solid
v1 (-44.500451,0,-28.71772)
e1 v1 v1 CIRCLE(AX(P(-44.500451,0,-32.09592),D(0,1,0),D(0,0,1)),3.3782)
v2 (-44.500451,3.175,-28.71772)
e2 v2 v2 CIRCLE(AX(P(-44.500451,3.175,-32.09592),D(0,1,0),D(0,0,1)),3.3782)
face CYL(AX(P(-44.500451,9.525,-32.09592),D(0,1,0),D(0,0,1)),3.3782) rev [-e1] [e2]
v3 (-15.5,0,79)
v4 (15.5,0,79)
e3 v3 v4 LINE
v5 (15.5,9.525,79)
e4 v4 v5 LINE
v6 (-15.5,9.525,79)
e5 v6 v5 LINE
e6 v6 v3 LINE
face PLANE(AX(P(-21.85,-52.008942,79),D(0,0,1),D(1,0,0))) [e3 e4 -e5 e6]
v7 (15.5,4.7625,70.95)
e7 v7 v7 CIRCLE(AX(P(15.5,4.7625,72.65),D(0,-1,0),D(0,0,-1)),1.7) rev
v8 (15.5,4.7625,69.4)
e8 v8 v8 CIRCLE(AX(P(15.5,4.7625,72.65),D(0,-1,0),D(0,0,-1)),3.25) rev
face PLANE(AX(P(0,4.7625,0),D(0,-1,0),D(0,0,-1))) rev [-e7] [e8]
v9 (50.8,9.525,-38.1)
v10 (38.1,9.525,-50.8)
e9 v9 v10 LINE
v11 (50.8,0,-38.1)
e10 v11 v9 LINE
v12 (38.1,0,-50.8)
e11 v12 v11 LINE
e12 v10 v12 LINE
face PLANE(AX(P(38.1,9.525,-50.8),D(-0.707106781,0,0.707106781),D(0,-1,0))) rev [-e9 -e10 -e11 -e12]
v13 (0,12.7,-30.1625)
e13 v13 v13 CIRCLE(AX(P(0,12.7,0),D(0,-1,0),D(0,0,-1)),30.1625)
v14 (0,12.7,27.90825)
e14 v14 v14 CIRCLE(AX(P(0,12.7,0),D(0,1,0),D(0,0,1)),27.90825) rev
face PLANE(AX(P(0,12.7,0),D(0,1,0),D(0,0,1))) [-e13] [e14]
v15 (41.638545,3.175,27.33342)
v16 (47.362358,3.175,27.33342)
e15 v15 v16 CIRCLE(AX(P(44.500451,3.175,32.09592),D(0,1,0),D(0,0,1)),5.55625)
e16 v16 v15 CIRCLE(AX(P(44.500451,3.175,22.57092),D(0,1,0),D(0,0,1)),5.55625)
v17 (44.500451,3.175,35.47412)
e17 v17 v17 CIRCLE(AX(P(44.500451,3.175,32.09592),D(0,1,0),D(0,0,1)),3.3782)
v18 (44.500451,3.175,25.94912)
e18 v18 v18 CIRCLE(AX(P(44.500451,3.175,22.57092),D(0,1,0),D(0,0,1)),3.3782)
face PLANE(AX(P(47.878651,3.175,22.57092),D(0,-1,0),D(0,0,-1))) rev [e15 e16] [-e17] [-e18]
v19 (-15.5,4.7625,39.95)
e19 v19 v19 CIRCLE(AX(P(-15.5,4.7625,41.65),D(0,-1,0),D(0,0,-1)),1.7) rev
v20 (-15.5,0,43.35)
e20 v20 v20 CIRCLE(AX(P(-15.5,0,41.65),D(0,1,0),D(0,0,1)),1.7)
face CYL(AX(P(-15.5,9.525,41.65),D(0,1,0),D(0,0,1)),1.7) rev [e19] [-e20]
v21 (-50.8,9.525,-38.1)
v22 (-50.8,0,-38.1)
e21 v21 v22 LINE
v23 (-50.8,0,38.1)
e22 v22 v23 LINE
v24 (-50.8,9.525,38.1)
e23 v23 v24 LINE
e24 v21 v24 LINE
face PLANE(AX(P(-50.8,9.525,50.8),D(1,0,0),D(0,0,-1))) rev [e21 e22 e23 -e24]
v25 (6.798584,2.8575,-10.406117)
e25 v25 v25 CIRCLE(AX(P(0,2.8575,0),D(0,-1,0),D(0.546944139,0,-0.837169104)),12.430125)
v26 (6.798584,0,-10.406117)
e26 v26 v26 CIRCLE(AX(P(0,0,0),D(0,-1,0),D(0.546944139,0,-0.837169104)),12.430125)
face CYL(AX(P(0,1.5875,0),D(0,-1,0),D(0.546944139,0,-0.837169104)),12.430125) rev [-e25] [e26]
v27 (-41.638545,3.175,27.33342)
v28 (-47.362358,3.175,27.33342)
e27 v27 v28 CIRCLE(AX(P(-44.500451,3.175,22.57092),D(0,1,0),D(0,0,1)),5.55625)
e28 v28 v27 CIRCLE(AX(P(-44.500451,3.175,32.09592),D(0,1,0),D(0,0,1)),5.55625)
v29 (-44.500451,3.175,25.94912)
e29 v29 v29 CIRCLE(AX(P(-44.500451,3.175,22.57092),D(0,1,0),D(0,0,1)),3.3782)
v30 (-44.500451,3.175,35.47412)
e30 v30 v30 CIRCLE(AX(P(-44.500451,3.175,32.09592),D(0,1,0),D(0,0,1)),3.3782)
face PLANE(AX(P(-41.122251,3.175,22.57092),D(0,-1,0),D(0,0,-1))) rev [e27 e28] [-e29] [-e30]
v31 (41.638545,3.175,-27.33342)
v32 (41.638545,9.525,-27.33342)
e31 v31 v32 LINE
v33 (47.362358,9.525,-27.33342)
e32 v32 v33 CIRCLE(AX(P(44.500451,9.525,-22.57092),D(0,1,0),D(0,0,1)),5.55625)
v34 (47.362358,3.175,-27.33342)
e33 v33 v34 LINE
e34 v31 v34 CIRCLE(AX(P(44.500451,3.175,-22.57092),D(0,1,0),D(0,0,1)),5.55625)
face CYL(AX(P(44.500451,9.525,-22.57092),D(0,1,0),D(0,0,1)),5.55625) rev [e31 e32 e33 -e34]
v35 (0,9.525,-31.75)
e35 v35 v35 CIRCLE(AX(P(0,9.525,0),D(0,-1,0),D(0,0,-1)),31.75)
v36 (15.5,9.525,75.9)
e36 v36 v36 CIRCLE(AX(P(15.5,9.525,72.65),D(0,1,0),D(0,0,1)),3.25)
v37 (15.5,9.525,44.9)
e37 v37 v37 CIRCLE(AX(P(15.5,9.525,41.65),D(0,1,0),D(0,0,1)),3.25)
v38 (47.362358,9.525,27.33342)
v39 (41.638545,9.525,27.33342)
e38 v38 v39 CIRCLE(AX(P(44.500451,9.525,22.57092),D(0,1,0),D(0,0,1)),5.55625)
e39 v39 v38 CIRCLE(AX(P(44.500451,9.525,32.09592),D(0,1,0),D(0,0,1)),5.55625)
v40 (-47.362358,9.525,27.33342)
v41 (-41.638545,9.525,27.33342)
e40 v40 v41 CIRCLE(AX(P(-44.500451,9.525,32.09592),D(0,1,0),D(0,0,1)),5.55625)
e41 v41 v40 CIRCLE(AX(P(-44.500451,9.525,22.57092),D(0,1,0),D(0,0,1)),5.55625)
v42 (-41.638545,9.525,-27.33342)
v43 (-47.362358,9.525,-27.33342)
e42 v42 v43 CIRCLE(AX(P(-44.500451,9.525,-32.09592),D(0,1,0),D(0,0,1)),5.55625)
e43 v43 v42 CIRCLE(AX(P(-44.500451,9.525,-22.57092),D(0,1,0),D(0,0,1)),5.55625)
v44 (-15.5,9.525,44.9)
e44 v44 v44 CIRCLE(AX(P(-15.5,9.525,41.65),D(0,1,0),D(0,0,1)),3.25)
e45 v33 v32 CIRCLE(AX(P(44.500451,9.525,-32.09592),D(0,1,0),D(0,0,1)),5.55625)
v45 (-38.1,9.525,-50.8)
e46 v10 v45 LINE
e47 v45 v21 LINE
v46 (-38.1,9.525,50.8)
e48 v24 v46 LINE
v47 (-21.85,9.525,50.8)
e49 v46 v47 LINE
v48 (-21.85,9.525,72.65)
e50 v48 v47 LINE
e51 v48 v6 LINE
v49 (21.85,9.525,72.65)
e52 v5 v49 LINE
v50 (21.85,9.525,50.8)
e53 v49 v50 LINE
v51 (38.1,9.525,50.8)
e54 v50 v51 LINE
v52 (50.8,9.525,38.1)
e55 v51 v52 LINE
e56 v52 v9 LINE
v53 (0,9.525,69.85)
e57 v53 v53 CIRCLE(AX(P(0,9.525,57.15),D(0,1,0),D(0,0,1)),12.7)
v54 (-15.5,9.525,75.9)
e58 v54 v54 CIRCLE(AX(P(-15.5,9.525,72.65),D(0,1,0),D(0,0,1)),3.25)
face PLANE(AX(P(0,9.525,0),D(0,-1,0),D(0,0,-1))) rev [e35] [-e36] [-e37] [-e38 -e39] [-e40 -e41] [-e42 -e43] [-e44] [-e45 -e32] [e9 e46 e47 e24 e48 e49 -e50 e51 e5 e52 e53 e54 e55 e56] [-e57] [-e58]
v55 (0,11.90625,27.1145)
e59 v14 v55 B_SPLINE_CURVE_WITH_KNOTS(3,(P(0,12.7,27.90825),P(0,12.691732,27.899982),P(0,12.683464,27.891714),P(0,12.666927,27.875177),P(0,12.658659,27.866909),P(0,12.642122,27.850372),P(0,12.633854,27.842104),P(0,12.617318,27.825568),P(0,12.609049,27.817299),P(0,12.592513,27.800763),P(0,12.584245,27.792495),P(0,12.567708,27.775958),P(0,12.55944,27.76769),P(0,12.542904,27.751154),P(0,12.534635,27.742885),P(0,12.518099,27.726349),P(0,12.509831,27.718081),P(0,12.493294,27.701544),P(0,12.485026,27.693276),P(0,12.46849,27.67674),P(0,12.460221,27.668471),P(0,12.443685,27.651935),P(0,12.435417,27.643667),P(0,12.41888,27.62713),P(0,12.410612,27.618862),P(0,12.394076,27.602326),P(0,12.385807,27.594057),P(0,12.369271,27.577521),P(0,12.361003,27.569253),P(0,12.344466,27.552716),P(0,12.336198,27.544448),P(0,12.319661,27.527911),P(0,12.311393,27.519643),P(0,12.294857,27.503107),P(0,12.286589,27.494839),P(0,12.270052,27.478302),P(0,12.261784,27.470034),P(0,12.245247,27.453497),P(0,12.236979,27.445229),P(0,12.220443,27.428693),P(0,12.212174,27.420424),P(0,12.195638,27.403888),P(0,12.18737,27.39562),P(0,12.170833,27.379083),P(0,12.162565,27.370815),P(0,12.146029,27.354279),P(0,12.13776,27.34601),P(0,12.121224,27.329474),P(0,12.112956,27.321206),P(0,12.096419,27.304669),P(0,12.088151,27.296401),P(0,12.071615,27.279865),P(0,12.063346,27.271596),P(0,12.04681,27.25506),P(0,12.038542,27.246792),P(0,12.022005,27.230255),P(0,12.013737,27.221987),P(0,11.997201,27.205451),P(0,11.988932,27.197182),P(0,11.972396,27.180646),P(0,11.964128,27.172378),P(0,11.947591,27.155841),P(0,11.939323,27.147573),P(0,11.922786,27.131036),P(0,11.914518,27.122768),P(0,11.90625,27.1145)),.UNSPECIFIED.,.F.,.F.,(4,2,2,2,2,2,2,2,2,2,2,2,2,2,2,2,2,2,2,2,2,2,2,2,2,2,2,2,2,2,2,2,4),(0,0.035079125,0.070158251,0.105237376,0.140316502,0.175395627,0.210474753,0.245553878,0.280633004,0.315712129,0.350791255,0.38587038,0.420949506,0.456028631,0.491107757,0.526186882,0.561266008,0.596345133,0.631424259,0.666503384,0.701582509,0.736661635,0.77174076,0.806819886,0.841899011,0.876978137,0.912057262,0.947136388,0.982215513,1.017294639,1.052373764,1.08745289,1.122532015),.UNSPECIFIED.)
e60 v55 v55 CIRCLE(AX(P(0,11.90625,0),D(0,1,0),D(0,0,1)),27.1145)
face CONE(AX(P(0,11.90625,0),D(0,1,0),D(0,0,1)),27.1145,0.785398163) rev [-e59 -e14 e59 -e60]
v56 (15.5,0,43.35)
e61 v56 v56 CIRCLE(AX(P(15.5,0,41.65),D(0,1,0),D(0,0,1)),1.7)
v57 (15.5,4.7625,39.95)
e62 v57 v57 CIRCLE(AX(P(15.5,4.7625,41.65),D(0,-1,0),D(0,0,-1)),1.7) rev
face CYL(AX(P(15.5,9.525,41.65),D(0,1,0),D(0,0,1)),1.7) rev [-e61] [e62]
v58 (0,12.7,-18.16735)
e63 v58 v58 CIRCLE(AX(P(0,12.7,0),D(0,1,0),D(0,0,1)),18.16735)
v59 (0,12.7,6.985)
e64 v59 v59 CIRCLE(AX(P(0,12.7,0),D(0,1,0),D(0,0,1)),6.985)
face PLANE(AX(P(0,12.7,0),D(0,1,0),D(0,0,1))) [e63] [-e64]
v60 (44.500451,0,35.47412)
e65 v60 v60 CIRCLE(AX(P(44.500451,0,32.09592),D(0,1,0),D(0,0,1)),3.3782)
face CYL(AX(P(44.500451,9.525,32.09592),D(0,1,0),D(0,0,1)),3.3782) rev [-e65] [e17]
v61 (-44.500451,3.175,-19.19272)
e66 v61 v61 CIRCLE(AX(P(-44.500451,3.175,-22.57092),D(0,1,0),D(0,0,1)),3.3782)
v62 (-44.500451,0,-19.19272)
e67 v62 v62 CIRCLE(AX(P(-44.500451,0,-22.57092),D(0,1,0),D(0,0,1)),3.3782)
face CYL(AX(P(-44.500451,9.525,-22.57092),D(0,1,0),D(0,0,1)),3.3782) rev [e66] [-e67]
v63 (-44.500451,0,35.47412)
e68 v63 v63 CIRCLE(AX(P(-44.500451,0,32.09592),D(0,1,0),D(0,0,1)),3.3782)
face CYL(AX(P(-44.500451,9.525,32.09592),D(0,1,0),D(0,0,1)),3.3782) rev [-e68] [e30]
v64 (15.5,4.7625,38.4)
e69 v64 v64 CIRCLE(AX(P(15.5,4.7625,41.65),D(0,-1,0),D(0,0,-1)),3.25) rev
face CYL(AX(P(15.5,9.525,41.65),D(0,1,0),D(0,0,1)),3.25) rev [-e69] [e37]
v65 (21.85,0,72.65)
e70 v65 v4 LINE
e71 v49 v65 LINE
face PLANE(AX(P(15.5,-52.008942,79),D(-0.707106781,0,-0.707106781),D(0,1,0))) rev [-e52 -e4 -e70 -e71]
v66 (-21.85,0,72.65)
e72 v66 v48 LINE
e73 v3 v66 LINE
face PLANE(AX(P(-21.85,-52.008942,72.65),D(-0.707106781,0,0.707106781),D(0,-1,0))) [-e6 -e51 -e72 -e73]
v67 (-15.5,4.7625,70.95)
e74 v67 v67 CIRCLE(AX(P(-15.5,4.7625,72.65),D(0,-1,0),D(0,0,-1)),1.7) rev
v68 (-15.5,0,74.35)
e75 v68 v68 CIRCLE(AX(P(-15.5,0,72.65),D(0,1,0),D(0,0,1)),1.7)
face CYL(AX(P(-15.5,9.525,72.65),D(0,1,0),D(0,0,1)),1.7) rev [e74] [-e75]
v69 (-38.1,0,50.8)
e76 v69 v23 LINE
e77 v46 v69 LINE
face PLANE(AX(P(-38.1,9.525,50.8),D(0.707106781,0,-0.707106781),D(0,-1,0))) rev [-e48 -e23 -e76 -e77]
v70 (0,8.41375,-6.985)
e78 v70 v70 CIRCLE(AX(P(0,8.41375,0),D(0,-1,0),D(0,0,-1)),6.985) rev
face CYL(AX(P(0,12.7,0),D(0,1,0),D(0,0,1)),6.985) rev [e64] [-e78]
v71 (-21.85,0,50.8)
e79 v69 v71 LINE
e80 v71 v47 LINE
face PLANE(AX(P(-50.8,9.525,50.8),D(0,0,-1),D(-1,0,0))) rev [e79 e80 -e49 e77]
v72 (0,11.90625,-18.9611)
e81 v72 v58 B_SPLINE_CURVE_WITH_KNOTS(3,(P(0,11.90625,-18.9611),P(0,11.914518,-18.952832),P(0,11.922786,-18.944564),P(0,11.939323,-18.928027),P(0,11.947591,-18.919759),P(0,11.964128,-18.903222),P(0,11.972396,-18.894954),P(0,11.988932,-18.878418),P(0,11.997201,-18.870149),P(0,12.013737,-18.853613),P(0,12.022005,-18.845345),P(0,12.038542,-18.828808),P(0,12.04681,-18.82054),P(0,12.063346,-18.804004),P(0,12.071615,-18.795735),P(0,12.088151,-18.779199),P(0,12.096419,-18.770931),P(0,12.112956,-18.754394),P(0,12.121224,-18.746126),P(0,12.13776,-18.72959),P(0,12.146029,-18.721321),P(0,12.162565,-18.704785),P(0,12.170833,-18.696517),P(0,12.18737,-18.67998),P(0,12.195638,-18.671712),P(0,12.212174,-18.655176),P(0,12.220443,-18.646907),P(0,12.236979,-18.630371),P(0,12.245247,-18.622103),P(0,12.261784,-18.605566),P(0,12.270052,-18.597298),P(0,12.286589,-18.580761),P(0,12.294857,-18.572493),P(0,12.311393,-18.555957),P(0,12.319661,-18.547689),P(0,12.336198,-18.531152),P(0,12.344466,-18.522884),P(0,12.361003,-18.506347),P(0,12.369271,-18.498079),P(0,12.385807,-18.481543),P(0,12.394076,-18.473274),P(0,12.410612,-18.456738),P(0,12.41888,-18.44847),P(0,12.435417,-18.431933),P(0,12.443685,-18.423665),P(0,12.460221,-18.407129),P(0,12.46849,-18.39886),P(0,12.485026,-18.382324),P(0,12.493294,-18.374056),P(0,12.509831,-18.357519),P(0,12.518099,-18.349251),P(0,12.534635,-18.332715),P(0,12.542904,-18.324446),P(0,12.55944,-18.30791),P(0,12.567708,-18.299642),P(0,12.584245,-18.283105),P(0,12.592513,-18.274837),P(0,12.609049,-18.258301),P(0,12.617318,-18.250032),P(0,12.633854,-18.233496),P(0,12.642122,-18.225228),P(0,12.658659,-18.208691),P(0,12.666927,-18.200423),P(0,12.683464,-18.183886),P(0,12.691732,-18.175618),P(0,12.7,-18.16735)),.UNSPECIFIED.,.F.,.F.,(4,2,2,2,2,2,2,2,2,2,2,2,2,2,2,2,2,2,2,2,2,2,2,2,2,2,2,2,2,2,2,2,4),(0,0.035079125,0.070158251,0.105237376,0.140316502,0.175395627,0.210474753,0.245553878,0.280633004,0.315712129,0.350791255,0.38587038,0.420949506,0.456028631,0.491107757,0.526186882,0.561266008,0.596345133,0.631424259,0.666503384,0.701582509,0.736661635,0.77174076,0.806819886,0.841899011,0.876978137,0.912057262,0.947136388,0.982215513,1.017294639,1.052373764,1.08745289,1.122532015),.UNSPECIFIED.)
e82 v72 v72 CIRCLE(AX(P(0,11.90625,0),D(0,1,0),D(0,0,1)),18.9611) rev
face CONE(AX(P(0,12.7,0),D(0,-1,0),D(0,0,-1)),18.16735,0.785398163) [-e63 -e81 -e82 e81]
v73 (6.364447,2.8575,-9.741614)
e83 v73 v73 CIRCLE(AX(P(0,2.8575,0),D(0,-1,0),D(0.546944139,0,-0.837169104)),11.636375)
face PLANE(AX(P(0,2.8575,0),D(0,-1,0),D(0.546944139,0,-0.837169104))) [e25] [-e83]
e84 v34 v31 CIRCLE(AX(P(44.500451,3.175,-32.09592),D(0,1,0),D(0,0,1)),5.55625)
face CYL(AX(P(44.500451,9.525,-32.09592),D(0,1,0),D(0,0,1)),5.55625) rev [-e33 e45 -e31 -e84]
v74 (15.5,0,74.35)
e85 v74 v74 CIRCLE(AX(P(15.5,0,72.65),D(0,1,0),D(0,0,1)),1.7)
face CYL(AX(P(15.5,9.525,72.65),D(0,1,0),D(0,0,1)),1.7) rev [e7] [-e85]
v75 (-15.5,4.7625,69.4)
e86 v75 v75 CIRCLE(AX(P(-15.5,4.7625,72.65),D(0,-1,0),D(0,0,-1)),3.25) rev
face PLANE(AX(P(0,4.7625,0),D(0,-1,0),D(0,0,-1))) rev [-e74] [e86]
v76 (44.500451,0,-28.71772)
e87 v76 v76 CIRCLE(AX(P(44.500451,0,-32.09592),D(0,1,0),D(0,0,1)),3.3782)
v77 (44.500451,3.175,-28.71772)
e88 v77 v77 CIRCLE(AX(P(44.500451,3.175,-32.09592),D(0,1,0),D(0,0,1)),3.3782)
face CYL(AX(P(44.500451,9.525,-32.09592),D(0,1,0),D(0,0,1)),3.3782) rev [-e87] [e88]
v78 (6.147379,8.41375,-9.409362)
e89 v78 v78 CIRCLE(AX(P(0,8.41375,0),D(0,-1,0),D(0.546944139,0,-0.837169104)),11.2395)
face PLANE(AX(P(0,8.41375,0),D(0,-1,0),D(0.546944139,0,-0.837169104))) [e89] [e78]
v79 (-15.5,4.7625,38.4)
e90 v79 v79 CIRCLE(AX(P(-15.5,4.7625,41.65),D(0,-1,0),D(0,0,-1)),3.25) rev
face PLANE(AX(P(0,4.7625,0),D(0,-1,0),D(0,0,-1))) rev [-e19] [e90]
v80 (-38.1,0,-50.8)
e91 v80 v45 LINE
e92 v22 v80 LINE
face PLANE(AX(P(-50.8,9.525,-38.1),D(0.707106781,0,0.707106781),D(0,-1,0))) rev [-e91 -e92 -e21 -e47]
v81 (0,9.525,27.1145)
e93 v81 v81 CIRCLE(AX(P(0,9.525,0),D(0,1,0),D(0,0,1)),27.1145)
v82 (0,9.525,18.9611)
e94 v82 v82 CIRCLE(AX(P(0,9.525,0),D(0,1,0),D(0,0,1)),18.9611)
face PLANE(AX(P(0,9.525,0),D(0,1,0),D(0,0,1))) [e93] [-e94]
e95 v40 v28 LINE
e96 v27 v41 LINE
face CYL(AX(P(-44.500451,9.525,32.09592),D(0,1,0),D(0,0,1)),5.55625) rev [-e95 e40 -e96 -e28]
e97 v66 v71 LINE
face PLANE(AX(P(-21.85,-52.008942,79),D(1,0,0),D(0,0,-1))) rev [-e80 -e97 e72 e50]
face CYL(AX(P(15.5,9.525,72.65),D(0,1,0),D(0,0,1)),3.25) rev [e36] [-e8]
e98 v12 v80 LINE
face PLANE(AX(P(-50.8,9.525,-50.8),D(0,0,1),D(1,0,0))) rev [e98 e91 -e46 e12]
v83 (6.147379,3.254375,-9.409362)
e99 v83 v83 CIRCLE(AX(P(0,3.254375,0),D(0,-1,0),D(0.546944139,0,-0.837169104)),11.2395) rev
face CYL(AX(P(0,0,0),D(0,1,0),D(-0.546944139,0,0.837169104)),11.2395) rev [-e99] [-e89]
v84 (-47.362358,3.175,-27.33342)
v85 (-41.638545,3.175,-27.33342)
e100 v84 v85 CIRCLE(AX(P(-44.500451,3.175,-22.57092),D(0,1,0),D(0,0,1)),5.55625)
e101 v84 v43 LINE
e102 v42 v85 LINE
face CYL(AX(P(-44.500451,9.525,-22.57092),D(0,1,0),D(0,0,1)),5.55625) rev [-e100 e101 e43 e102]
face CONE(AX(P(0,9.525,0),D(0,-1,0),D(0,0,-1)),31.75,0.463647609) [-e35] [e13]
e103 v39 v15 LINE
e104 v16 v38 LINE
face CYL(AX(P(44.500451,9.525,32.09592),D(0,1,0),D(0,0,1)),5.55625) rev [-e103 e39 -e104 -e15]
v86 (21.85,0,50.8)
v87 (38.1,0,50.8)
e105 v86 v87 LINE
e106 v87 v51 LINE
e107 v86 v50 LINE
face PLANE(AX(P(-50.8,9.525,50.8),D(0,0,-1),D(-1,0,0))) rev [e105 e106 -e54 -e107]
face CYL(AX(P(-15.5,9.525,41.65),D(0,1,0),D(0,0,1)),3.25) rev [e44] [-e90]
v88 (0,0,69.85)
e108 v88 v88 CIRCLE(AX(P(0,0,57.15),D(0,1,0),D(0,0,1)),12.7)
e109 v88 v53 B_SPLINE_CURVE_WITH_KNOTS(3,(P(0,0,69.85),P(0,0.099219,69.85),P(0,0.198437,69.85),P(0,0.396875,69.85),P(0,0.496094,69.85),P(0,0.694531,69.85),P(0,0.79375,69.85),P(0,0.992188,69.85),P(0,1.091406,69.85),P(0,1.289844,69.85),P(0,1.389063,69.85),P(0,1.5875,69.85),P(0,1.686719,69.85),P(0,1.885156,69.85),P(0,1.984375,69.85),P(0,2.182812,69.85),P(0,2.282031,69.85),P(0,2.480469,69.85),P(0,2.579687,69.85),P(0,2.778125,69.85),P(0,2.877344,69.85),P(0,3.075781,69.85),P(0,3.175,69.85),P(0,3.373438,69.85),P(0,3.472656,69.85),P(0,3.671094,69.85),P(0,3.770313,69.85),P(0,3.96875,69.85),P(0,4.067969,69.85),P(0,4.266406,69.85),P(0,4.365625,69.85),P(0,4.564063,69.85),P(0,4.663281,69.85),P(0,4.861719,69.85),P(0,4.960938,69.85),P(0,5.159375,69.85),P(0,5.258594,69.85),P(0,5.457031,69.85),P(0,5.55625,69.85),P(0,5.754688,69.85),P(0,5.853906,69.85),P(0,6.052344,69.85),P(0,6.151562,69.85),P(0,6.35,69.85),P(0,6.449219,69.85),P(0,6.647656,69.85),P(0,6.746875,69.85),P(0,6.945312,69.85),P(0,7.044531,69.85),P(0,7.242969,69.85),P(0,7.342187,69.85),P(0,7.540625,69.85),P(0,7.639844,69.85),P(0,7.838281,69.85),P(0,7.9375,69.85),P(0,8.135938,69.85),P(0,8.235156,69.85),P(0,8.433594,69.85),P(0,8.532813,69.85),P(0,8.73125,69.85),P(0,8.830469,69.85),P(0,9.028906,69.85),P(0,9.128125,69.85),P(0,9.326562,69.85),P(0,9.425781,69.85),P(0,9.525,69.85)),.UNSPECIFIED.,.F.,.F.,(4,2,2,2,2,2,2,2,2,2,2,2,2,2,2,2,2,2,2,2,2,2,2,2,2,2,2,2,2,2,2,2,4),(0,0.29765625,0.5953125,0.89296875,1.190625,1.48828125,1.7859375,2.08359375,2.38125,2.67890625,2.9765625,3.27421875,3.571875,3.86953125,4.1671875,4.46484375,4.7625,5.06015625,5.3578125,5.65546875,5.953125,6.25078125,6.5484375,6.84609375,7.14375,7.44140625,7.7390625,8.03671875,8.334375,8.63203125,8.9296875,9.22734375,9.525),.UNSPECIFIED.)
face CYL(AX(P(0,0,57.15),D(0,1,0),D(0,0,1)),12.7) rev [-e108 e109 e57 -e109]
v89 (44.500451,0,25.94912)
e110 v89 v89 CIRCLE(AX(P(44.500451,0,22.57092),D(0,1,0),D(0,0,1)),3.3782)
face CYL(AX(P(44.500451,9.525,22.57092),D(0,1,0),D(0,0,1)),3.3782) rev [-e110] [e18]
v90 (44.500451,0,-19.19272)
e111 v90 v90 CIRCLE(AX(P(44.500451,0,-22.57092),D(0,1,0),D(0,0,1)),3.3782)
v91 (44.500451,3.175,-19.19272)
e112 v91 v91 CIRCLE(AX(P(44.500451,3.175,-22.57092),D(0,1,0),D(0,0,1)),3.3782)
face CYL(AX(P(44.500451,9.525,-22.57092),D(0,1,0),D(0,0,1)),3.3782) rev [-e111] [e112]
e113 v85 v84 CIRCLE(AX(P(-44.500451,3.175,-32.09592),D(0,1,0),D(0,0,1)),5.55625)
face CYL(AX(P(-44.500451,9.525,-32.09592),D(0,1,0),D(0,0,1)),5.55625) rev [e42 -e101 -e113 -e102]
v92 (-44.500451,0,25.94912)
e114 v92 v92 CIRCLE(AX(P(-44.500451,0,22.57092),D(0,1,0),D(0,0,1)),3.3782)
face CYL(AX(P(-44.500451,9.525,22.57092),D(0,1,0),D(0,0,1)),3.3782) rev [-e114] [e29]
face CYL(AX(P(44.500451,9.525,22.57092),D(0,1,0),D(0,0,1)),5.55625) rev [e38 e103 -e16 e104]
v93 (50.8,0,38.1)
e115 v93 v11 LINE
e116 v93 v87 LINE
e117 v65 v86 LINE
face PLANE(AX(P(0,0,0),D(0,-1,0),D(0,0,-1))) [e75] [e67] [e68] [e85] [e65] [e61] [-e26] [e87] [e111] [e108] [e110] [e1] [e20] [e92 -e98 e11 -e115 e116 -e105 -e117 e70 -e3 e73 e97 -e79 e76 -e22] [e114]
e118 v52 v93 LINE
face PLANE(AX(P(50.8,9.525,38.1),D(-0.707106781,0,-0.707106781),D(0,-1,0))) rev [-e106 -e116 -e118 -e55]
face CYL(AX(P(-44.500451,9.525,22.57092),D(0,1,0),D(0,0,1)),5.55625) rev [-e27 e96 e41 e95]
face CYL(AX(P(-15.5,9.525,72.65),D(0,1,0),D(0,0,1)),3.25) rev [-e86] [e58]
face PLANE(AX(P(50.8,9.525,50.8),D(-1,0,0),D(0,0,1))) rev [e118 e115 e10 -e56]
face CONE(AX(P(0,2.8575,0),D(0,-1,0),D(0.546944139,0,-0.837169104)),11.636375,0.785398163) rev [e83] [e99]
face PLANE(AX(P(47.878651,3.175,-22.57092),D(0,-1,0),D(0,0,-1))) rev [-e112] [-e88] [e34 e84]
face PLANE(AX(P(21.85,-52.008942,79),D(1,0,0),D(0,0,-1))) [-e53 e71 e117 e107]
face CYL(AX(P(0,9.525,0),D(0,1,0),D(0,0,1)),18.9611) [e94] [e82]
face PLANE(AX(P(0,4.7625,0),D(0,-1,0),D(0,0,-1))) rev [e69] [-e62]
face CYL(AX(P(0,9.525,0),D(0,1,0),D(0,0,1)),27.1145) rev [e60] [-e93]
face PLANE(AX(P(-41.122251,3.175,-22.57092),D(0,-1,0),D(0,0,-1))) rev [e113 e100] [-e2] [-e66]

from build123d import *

# Parameters (mm, degrees)
SKETCH4_W                                        = 101.6
SKETCH4_H                                        = 101.6
BOSS_EXTRUDE1_DEPTH                              = 9.525
SKETCH14_R                                       = 26.9875
SKETCH14_R_2                                     = 19.0881
CUT_EXTRUDE2_DEPTH                               = 3.175
MOVE_FACE1_BY                                    = 0.127
MOVE_FACE1_2_BY                                  = 0.127
F_3_8_CLEARANCE_HOLE1_D                          = 13.97
SKETCH19_W                                       = 43.7
SKETCH19_H                                       = 28.2
BOSS_EXTRUDE4_DEPTH                              = 9.525
CBORE_FOR_M3_SHCS1_D                             = 3.4
CBORE_FOR_M3_SHCS1_CBORE_D                       = 6.5
CBORE_FOR_M3_SHCS1_CBORE_DEPTH                   = 3
MOVE_FACE4_BY                                    = 1.5875
MOVE_FACE4_2_BY                                  = 1.5875
MOVE_FACE4_3_BY                                  = 1.5875
MOVE_FACE4_4_BY                                  = 1.5875
SKETCH11_R                                       = 12.7
CUT_EXTRUDE1_DEPTH                               = 95.405326253
CHAMFER1_SIZE                                    = 0.79375
BODY_MOVE_COPY2_ANGLE                            = 180
SKETCH21_R                                       = 3.25
CUT_EXTRUDE3_DEPTH                               = 4.7625
CHAMFER2_SIZE                                    = 12.7
CHAMFER3_SIZE                                    = 6.35
CBORE_FOR_1_4_SOCKET_HEAD_CAP_SCREW1_D           = 6.7564
CBORE_FOR_1_4_SOCKET_HEAD_CAP_SCREW1_CBORE_D     = 11.1125
CBORE_FOR_1_4_SOCKET_HEAD_CAP_SCREW1_CBORE_DEPTH = 6.35
MIRROR2_COPY_1_D                                 = 6.7564
MIRROR2_COPY_1_CBORE_D                           = 11.1125
MIRROR2_COPY_1_CBORE_DEPTH                       = 6.35


with BuildPart() as part:
    # Sketch4 → Boss-Extrude1 (new body)
    with BuildSketch(Plane(origin=(0, 0, 0), x_dir=(1, 0, 0), z_dir=(0, 1, 0))):
        Rectangle(SKETCH4_W, SKETCH4_H)
    extrude(amount=BOSS_EXTRUDE1_DEPTH)

    # Sketch5 → Revolve1 (revolve)
    with BuildSketch(Plane(origin=(0, 0, 0), x_dir=(0, 0, -1), z_dir=(1, 0, 0))):
        Polygon((0, 9.525), (0, 12.7), (30.1625, 12.7), (31.75, 9.525), align=None)
    revolve(axis=Axis((0, 0, 0), (0, 1, 0)))

    # Sketch14 → Cut-Extrude2 (cut)
    with BuildSketch(Plane(origin=(0, 12.7, 0), x_dir=(1, 0, 0), z_dir=(0, 1, 0))):
        with Locations(Location((0, 0, 0), (0, 0, 270))):
            Circle(SKETCH14_R)
        with Locations(Location((0, 0, 0), (0, 0, 270))):
            Circle(SKETCH14_R_2, mode=Mode.SUBTRACT)
    extrude(amount=-CUT_EXTRUDE2_DEPTH, mode=Mode.SUBTRACT)

    # Move Face1: a curved face moved inward by 0.127
    add(Solid.thicken(part.faces().sort_by_distance((0, 11.1125, -19.0881))[0], -MOVE_FACE1_BY), mode=Mode.SUBTRACT)

    # Move Face1 2: a curved face moved inward by 0.127
    add(Solid.thicken(part.faces().sort_by_distance((0, 11.1125, -26.9875))[0], -MOVE_FACE1_2_BY), mode=Mode.SUBTRACT)

    # 3/8 Clearance Hole1 (through all)
    with Locations(Plane(origin=(0, 12.7, 0), x_dir=(1, 0, 0), z_dir=(0, 1, 0))):
        with Locations((0, 0)):
            Hole(F_3_8_CLEARANCE_HOLE1_D / 2)

    # Sketch19 → Boss-Extrude4 (add)
    with BuildSketch(Plane(origin=(0, 9.525, 0), x_dir=(1, 0, 0), z_dir=(0, 1, 0))):
        with Locations((0, -64.9)):
            Rectangle(SKETCH19_W, SKETCH19_H)
    extrude(amount=-BOSS_EXTRUDE4_DEPTH)

    # CBORE for M3 SHCS1 (through all)
    with Locations(Plane(origin=(0, 9.525, 0), x_dir=(1, 0, 0), z_dir=(0, 1, 0))):
        with Locations((-15.5, -41.65), (15.5, -41.65), (15.5, -72.65), (-15.5, -72.65)):
            CounterBoreHole(CBORE_FOR_M3_SHCS1_D / 2, CBORE_FOR_M3_SHCS1_CBORE_D / 2, CBORE_FOR_M3_SHCS1_CBORE_DEPTH)

    # Move Face4: a face moved inward by 1.5875
    extrude(part.faces().sort_by_distance((15.5, 6.525, 44.25))[0], amount=MOVE_FACE4_BY, dir=(0, -1, 0), mode=Mode.SUBTRACT)

    # Move Face4 2: a face moved inward by 1.5875
    extrude(part.faces().sort_by_distance((-15.5, 6.525, 44.25))[0], amount=MOVE_FACE4_2_BY, dir=(0, -1, 0), mode=Mode.SUBTRACT)

    # Move Face4 3: a face moved inward by 1.5875
    extrude(part.faces().sort_by_distance((-15.5, 6.525, 75.25))[0], amount=MOVE_FACE4_3_BY, dir=(0, -1, 0), mode=Mode.SUBTRACT)

    # Move Face4 4: a face moved inward by 1.5875
    extrude(part.faces().sort_by_distance((15.5, 6.525, 75.25))[0], amount=MOVE_FACE4_4_BY, dir=(0, -1, 0), mode=Mode.SUBTRACT)

    # Sketch11 → Cut-Extrude1 (cut, through all)
    with BuildSketch(Plane(origin=(0, 9.525, 0), x_dir=(1, 0, 0), z_dir=(0, 1, 0))):
        with Locations(Location((0, -57.15, 0), (0, 0, 270))):
            Circle(SKETCH11_R)
    extrude(amount=-CUT_EXTRUDE1_DEPTH, mode=Mode.SUBTRACT)

    # Chamfer1
    chamfer1_edges = [part.edges().sort_by_distance(p)[0] for p in [
        (0, 12.7, -27.1145),
        (0, 12.7, -18.9611),
    ]]
    chamfer(chamfer1_edges, length=CHAMFER1_SIZE)


with BuildPart() as body_2:
    # uxcell-FR6ZZ: read off the stored shape, not the designer's step
    # uxcell-FR6ZZ outline → uxcell-FR6ZZ (revolve)
    with BuildSketch(Plane(origin=(-24.054896115, 0, 40.177492641), x_dir=(1, 0, 0), z_dir=(0, 0, 1))):
        Polygon((12.430125, -6.322384388), (4.7625, -6.322384388), (4.7625, -14.736134388), (11.2395, -14.736134388), (11.2395, -9.576759388), (11.636375, -9.179884388), (12.430125, -9.179884388), align=None)
    revolve(axis=Axis((-24.054896115, 0, 40.177492641), (0, 1, 0)))


with BuildPart() as body_2_1:
    # Body-Move/Copy2: read off the stored shape, not the designer's step
    # Body-Move/Copy2: moved
    add(body_2.part.moved(Location((24.0548961, 6.3223844, -40.1774926))).rotate(Axis((0, 0, 0), (0.9584281675, 0, 0.2853339234)), BODY_MOVE_COPY2_ANGLE))


with BuildPart() as part_1:
    add(part.part)

    # Combine1: cut body 2
    add(body_2_1.part, mode=Mode.SUBTRACT)

    # Sketch21 → Cut-Extrude3 (cut)
    with BuildSketch(Plane(origin=(0, 9.525, 0), x_dir=(1, 0, 0), z_dir=(0, 1, 0))):
        with Locations(Location((-15.5, -72.65, 0), (0, 0, 270))):
            Circle(SKETCH21_R)
        with Locations(Location((15.5, -72.65, 0), (0, 0, 270))):
            Circle(SKETCH21_R)
        with Locations(Location((15.5, -41.65, 0), (0, 0, 270))):
            Circle(SKETCH21_R)
        with Locations(Location((-15.5, -41.65, 0), (0, 0, 270))):
            Circle(SKETCH21_R)
    extrude(amount=-CUT_EXTRUDE3_DEPTH, mode=Mode.SUBTRACT)

    # Chamfer2
    chamfer2_edges = [part_1.edges().sort_by_distance(p)[0] for p in [
        (50.8, 4.7625, 50.8),
        (-50.8, 4.7625, 50.8),
        (-50.8, 4.7625, -50.8),
        (50.8, 4.7625, -50.8),
    ]]
    chamfer(chamfer2_edges, length=CHAMFER2_SIZE)

    # Chamfer3
    chamfer3_edges = [part_1.edges().sort_by_distance(p)[0] for p in [
        (-21.85, 4.7625, 79),
        (21.85, 4.7625, 79),
    ]]
    chamfer(chamfer3_edges, length=CHAMFER3_SIZE)

    # CBORE for 1/4 Socket Head Cap Screw1 (through all)
    with Locations(Plane(origin=(0, 9.525, 0), x_dir=(1, 0, 0), z_dir=(0, 1, 0))):
        with Locations((-44.500451365, 32.095919635), (-44.500451365, 22.570919635)):
            cbore_for_1_4_socket_head_cap_screw1 = CounterBoreHole(CBORE_FOR_1_4_SOCKET_HEAD_CAP_SCREW1_D / 2, CBORE_FOR_1_4_SOCKET_HEAD_CAP_SCREW1_CBORE_D / 2, CBORE_FOR_1_4_SOCKET_HEAD_CAP_SCREW1_CBORE_DEPTH)

    # Mirror1: CBORE for 1/4 Socket Head Cap Screw1 across plane
    add(cbore_for_1_4_socket_head_cap_screw1.mirror(Plane.XY), mode=Mode.SUBTRACT)

    # Mirror2: CBORE for 1/4 Socket Head Cap Screw1 across plane
    add(cbore_for_1_4_socket_head_cap_screw1.mirror(Plane(origin=(0, 0, 0), x_dir=(0, 0, 1), z_dir=(1, 0, 0))), mode=Mode.SUBTRACT)

    # Mirror2 copy 1 (through all)
    with Locations(Plane(origin=(0, 9.525, 0), x_dir=(-1, 0, 0), z_dir=(0, 1, 0))):
        with Locations((-44.500451365, 32.095919635), (-44.500451365, 22.570919635)):
            CounterBoreHole(MIRROR2_COPY_1_D / 2, MIRROR2_COPY_1_CBORE_D / 2, MIRROR2_COPY_1_CBORE_DEPTH)


solid = part_1.part
